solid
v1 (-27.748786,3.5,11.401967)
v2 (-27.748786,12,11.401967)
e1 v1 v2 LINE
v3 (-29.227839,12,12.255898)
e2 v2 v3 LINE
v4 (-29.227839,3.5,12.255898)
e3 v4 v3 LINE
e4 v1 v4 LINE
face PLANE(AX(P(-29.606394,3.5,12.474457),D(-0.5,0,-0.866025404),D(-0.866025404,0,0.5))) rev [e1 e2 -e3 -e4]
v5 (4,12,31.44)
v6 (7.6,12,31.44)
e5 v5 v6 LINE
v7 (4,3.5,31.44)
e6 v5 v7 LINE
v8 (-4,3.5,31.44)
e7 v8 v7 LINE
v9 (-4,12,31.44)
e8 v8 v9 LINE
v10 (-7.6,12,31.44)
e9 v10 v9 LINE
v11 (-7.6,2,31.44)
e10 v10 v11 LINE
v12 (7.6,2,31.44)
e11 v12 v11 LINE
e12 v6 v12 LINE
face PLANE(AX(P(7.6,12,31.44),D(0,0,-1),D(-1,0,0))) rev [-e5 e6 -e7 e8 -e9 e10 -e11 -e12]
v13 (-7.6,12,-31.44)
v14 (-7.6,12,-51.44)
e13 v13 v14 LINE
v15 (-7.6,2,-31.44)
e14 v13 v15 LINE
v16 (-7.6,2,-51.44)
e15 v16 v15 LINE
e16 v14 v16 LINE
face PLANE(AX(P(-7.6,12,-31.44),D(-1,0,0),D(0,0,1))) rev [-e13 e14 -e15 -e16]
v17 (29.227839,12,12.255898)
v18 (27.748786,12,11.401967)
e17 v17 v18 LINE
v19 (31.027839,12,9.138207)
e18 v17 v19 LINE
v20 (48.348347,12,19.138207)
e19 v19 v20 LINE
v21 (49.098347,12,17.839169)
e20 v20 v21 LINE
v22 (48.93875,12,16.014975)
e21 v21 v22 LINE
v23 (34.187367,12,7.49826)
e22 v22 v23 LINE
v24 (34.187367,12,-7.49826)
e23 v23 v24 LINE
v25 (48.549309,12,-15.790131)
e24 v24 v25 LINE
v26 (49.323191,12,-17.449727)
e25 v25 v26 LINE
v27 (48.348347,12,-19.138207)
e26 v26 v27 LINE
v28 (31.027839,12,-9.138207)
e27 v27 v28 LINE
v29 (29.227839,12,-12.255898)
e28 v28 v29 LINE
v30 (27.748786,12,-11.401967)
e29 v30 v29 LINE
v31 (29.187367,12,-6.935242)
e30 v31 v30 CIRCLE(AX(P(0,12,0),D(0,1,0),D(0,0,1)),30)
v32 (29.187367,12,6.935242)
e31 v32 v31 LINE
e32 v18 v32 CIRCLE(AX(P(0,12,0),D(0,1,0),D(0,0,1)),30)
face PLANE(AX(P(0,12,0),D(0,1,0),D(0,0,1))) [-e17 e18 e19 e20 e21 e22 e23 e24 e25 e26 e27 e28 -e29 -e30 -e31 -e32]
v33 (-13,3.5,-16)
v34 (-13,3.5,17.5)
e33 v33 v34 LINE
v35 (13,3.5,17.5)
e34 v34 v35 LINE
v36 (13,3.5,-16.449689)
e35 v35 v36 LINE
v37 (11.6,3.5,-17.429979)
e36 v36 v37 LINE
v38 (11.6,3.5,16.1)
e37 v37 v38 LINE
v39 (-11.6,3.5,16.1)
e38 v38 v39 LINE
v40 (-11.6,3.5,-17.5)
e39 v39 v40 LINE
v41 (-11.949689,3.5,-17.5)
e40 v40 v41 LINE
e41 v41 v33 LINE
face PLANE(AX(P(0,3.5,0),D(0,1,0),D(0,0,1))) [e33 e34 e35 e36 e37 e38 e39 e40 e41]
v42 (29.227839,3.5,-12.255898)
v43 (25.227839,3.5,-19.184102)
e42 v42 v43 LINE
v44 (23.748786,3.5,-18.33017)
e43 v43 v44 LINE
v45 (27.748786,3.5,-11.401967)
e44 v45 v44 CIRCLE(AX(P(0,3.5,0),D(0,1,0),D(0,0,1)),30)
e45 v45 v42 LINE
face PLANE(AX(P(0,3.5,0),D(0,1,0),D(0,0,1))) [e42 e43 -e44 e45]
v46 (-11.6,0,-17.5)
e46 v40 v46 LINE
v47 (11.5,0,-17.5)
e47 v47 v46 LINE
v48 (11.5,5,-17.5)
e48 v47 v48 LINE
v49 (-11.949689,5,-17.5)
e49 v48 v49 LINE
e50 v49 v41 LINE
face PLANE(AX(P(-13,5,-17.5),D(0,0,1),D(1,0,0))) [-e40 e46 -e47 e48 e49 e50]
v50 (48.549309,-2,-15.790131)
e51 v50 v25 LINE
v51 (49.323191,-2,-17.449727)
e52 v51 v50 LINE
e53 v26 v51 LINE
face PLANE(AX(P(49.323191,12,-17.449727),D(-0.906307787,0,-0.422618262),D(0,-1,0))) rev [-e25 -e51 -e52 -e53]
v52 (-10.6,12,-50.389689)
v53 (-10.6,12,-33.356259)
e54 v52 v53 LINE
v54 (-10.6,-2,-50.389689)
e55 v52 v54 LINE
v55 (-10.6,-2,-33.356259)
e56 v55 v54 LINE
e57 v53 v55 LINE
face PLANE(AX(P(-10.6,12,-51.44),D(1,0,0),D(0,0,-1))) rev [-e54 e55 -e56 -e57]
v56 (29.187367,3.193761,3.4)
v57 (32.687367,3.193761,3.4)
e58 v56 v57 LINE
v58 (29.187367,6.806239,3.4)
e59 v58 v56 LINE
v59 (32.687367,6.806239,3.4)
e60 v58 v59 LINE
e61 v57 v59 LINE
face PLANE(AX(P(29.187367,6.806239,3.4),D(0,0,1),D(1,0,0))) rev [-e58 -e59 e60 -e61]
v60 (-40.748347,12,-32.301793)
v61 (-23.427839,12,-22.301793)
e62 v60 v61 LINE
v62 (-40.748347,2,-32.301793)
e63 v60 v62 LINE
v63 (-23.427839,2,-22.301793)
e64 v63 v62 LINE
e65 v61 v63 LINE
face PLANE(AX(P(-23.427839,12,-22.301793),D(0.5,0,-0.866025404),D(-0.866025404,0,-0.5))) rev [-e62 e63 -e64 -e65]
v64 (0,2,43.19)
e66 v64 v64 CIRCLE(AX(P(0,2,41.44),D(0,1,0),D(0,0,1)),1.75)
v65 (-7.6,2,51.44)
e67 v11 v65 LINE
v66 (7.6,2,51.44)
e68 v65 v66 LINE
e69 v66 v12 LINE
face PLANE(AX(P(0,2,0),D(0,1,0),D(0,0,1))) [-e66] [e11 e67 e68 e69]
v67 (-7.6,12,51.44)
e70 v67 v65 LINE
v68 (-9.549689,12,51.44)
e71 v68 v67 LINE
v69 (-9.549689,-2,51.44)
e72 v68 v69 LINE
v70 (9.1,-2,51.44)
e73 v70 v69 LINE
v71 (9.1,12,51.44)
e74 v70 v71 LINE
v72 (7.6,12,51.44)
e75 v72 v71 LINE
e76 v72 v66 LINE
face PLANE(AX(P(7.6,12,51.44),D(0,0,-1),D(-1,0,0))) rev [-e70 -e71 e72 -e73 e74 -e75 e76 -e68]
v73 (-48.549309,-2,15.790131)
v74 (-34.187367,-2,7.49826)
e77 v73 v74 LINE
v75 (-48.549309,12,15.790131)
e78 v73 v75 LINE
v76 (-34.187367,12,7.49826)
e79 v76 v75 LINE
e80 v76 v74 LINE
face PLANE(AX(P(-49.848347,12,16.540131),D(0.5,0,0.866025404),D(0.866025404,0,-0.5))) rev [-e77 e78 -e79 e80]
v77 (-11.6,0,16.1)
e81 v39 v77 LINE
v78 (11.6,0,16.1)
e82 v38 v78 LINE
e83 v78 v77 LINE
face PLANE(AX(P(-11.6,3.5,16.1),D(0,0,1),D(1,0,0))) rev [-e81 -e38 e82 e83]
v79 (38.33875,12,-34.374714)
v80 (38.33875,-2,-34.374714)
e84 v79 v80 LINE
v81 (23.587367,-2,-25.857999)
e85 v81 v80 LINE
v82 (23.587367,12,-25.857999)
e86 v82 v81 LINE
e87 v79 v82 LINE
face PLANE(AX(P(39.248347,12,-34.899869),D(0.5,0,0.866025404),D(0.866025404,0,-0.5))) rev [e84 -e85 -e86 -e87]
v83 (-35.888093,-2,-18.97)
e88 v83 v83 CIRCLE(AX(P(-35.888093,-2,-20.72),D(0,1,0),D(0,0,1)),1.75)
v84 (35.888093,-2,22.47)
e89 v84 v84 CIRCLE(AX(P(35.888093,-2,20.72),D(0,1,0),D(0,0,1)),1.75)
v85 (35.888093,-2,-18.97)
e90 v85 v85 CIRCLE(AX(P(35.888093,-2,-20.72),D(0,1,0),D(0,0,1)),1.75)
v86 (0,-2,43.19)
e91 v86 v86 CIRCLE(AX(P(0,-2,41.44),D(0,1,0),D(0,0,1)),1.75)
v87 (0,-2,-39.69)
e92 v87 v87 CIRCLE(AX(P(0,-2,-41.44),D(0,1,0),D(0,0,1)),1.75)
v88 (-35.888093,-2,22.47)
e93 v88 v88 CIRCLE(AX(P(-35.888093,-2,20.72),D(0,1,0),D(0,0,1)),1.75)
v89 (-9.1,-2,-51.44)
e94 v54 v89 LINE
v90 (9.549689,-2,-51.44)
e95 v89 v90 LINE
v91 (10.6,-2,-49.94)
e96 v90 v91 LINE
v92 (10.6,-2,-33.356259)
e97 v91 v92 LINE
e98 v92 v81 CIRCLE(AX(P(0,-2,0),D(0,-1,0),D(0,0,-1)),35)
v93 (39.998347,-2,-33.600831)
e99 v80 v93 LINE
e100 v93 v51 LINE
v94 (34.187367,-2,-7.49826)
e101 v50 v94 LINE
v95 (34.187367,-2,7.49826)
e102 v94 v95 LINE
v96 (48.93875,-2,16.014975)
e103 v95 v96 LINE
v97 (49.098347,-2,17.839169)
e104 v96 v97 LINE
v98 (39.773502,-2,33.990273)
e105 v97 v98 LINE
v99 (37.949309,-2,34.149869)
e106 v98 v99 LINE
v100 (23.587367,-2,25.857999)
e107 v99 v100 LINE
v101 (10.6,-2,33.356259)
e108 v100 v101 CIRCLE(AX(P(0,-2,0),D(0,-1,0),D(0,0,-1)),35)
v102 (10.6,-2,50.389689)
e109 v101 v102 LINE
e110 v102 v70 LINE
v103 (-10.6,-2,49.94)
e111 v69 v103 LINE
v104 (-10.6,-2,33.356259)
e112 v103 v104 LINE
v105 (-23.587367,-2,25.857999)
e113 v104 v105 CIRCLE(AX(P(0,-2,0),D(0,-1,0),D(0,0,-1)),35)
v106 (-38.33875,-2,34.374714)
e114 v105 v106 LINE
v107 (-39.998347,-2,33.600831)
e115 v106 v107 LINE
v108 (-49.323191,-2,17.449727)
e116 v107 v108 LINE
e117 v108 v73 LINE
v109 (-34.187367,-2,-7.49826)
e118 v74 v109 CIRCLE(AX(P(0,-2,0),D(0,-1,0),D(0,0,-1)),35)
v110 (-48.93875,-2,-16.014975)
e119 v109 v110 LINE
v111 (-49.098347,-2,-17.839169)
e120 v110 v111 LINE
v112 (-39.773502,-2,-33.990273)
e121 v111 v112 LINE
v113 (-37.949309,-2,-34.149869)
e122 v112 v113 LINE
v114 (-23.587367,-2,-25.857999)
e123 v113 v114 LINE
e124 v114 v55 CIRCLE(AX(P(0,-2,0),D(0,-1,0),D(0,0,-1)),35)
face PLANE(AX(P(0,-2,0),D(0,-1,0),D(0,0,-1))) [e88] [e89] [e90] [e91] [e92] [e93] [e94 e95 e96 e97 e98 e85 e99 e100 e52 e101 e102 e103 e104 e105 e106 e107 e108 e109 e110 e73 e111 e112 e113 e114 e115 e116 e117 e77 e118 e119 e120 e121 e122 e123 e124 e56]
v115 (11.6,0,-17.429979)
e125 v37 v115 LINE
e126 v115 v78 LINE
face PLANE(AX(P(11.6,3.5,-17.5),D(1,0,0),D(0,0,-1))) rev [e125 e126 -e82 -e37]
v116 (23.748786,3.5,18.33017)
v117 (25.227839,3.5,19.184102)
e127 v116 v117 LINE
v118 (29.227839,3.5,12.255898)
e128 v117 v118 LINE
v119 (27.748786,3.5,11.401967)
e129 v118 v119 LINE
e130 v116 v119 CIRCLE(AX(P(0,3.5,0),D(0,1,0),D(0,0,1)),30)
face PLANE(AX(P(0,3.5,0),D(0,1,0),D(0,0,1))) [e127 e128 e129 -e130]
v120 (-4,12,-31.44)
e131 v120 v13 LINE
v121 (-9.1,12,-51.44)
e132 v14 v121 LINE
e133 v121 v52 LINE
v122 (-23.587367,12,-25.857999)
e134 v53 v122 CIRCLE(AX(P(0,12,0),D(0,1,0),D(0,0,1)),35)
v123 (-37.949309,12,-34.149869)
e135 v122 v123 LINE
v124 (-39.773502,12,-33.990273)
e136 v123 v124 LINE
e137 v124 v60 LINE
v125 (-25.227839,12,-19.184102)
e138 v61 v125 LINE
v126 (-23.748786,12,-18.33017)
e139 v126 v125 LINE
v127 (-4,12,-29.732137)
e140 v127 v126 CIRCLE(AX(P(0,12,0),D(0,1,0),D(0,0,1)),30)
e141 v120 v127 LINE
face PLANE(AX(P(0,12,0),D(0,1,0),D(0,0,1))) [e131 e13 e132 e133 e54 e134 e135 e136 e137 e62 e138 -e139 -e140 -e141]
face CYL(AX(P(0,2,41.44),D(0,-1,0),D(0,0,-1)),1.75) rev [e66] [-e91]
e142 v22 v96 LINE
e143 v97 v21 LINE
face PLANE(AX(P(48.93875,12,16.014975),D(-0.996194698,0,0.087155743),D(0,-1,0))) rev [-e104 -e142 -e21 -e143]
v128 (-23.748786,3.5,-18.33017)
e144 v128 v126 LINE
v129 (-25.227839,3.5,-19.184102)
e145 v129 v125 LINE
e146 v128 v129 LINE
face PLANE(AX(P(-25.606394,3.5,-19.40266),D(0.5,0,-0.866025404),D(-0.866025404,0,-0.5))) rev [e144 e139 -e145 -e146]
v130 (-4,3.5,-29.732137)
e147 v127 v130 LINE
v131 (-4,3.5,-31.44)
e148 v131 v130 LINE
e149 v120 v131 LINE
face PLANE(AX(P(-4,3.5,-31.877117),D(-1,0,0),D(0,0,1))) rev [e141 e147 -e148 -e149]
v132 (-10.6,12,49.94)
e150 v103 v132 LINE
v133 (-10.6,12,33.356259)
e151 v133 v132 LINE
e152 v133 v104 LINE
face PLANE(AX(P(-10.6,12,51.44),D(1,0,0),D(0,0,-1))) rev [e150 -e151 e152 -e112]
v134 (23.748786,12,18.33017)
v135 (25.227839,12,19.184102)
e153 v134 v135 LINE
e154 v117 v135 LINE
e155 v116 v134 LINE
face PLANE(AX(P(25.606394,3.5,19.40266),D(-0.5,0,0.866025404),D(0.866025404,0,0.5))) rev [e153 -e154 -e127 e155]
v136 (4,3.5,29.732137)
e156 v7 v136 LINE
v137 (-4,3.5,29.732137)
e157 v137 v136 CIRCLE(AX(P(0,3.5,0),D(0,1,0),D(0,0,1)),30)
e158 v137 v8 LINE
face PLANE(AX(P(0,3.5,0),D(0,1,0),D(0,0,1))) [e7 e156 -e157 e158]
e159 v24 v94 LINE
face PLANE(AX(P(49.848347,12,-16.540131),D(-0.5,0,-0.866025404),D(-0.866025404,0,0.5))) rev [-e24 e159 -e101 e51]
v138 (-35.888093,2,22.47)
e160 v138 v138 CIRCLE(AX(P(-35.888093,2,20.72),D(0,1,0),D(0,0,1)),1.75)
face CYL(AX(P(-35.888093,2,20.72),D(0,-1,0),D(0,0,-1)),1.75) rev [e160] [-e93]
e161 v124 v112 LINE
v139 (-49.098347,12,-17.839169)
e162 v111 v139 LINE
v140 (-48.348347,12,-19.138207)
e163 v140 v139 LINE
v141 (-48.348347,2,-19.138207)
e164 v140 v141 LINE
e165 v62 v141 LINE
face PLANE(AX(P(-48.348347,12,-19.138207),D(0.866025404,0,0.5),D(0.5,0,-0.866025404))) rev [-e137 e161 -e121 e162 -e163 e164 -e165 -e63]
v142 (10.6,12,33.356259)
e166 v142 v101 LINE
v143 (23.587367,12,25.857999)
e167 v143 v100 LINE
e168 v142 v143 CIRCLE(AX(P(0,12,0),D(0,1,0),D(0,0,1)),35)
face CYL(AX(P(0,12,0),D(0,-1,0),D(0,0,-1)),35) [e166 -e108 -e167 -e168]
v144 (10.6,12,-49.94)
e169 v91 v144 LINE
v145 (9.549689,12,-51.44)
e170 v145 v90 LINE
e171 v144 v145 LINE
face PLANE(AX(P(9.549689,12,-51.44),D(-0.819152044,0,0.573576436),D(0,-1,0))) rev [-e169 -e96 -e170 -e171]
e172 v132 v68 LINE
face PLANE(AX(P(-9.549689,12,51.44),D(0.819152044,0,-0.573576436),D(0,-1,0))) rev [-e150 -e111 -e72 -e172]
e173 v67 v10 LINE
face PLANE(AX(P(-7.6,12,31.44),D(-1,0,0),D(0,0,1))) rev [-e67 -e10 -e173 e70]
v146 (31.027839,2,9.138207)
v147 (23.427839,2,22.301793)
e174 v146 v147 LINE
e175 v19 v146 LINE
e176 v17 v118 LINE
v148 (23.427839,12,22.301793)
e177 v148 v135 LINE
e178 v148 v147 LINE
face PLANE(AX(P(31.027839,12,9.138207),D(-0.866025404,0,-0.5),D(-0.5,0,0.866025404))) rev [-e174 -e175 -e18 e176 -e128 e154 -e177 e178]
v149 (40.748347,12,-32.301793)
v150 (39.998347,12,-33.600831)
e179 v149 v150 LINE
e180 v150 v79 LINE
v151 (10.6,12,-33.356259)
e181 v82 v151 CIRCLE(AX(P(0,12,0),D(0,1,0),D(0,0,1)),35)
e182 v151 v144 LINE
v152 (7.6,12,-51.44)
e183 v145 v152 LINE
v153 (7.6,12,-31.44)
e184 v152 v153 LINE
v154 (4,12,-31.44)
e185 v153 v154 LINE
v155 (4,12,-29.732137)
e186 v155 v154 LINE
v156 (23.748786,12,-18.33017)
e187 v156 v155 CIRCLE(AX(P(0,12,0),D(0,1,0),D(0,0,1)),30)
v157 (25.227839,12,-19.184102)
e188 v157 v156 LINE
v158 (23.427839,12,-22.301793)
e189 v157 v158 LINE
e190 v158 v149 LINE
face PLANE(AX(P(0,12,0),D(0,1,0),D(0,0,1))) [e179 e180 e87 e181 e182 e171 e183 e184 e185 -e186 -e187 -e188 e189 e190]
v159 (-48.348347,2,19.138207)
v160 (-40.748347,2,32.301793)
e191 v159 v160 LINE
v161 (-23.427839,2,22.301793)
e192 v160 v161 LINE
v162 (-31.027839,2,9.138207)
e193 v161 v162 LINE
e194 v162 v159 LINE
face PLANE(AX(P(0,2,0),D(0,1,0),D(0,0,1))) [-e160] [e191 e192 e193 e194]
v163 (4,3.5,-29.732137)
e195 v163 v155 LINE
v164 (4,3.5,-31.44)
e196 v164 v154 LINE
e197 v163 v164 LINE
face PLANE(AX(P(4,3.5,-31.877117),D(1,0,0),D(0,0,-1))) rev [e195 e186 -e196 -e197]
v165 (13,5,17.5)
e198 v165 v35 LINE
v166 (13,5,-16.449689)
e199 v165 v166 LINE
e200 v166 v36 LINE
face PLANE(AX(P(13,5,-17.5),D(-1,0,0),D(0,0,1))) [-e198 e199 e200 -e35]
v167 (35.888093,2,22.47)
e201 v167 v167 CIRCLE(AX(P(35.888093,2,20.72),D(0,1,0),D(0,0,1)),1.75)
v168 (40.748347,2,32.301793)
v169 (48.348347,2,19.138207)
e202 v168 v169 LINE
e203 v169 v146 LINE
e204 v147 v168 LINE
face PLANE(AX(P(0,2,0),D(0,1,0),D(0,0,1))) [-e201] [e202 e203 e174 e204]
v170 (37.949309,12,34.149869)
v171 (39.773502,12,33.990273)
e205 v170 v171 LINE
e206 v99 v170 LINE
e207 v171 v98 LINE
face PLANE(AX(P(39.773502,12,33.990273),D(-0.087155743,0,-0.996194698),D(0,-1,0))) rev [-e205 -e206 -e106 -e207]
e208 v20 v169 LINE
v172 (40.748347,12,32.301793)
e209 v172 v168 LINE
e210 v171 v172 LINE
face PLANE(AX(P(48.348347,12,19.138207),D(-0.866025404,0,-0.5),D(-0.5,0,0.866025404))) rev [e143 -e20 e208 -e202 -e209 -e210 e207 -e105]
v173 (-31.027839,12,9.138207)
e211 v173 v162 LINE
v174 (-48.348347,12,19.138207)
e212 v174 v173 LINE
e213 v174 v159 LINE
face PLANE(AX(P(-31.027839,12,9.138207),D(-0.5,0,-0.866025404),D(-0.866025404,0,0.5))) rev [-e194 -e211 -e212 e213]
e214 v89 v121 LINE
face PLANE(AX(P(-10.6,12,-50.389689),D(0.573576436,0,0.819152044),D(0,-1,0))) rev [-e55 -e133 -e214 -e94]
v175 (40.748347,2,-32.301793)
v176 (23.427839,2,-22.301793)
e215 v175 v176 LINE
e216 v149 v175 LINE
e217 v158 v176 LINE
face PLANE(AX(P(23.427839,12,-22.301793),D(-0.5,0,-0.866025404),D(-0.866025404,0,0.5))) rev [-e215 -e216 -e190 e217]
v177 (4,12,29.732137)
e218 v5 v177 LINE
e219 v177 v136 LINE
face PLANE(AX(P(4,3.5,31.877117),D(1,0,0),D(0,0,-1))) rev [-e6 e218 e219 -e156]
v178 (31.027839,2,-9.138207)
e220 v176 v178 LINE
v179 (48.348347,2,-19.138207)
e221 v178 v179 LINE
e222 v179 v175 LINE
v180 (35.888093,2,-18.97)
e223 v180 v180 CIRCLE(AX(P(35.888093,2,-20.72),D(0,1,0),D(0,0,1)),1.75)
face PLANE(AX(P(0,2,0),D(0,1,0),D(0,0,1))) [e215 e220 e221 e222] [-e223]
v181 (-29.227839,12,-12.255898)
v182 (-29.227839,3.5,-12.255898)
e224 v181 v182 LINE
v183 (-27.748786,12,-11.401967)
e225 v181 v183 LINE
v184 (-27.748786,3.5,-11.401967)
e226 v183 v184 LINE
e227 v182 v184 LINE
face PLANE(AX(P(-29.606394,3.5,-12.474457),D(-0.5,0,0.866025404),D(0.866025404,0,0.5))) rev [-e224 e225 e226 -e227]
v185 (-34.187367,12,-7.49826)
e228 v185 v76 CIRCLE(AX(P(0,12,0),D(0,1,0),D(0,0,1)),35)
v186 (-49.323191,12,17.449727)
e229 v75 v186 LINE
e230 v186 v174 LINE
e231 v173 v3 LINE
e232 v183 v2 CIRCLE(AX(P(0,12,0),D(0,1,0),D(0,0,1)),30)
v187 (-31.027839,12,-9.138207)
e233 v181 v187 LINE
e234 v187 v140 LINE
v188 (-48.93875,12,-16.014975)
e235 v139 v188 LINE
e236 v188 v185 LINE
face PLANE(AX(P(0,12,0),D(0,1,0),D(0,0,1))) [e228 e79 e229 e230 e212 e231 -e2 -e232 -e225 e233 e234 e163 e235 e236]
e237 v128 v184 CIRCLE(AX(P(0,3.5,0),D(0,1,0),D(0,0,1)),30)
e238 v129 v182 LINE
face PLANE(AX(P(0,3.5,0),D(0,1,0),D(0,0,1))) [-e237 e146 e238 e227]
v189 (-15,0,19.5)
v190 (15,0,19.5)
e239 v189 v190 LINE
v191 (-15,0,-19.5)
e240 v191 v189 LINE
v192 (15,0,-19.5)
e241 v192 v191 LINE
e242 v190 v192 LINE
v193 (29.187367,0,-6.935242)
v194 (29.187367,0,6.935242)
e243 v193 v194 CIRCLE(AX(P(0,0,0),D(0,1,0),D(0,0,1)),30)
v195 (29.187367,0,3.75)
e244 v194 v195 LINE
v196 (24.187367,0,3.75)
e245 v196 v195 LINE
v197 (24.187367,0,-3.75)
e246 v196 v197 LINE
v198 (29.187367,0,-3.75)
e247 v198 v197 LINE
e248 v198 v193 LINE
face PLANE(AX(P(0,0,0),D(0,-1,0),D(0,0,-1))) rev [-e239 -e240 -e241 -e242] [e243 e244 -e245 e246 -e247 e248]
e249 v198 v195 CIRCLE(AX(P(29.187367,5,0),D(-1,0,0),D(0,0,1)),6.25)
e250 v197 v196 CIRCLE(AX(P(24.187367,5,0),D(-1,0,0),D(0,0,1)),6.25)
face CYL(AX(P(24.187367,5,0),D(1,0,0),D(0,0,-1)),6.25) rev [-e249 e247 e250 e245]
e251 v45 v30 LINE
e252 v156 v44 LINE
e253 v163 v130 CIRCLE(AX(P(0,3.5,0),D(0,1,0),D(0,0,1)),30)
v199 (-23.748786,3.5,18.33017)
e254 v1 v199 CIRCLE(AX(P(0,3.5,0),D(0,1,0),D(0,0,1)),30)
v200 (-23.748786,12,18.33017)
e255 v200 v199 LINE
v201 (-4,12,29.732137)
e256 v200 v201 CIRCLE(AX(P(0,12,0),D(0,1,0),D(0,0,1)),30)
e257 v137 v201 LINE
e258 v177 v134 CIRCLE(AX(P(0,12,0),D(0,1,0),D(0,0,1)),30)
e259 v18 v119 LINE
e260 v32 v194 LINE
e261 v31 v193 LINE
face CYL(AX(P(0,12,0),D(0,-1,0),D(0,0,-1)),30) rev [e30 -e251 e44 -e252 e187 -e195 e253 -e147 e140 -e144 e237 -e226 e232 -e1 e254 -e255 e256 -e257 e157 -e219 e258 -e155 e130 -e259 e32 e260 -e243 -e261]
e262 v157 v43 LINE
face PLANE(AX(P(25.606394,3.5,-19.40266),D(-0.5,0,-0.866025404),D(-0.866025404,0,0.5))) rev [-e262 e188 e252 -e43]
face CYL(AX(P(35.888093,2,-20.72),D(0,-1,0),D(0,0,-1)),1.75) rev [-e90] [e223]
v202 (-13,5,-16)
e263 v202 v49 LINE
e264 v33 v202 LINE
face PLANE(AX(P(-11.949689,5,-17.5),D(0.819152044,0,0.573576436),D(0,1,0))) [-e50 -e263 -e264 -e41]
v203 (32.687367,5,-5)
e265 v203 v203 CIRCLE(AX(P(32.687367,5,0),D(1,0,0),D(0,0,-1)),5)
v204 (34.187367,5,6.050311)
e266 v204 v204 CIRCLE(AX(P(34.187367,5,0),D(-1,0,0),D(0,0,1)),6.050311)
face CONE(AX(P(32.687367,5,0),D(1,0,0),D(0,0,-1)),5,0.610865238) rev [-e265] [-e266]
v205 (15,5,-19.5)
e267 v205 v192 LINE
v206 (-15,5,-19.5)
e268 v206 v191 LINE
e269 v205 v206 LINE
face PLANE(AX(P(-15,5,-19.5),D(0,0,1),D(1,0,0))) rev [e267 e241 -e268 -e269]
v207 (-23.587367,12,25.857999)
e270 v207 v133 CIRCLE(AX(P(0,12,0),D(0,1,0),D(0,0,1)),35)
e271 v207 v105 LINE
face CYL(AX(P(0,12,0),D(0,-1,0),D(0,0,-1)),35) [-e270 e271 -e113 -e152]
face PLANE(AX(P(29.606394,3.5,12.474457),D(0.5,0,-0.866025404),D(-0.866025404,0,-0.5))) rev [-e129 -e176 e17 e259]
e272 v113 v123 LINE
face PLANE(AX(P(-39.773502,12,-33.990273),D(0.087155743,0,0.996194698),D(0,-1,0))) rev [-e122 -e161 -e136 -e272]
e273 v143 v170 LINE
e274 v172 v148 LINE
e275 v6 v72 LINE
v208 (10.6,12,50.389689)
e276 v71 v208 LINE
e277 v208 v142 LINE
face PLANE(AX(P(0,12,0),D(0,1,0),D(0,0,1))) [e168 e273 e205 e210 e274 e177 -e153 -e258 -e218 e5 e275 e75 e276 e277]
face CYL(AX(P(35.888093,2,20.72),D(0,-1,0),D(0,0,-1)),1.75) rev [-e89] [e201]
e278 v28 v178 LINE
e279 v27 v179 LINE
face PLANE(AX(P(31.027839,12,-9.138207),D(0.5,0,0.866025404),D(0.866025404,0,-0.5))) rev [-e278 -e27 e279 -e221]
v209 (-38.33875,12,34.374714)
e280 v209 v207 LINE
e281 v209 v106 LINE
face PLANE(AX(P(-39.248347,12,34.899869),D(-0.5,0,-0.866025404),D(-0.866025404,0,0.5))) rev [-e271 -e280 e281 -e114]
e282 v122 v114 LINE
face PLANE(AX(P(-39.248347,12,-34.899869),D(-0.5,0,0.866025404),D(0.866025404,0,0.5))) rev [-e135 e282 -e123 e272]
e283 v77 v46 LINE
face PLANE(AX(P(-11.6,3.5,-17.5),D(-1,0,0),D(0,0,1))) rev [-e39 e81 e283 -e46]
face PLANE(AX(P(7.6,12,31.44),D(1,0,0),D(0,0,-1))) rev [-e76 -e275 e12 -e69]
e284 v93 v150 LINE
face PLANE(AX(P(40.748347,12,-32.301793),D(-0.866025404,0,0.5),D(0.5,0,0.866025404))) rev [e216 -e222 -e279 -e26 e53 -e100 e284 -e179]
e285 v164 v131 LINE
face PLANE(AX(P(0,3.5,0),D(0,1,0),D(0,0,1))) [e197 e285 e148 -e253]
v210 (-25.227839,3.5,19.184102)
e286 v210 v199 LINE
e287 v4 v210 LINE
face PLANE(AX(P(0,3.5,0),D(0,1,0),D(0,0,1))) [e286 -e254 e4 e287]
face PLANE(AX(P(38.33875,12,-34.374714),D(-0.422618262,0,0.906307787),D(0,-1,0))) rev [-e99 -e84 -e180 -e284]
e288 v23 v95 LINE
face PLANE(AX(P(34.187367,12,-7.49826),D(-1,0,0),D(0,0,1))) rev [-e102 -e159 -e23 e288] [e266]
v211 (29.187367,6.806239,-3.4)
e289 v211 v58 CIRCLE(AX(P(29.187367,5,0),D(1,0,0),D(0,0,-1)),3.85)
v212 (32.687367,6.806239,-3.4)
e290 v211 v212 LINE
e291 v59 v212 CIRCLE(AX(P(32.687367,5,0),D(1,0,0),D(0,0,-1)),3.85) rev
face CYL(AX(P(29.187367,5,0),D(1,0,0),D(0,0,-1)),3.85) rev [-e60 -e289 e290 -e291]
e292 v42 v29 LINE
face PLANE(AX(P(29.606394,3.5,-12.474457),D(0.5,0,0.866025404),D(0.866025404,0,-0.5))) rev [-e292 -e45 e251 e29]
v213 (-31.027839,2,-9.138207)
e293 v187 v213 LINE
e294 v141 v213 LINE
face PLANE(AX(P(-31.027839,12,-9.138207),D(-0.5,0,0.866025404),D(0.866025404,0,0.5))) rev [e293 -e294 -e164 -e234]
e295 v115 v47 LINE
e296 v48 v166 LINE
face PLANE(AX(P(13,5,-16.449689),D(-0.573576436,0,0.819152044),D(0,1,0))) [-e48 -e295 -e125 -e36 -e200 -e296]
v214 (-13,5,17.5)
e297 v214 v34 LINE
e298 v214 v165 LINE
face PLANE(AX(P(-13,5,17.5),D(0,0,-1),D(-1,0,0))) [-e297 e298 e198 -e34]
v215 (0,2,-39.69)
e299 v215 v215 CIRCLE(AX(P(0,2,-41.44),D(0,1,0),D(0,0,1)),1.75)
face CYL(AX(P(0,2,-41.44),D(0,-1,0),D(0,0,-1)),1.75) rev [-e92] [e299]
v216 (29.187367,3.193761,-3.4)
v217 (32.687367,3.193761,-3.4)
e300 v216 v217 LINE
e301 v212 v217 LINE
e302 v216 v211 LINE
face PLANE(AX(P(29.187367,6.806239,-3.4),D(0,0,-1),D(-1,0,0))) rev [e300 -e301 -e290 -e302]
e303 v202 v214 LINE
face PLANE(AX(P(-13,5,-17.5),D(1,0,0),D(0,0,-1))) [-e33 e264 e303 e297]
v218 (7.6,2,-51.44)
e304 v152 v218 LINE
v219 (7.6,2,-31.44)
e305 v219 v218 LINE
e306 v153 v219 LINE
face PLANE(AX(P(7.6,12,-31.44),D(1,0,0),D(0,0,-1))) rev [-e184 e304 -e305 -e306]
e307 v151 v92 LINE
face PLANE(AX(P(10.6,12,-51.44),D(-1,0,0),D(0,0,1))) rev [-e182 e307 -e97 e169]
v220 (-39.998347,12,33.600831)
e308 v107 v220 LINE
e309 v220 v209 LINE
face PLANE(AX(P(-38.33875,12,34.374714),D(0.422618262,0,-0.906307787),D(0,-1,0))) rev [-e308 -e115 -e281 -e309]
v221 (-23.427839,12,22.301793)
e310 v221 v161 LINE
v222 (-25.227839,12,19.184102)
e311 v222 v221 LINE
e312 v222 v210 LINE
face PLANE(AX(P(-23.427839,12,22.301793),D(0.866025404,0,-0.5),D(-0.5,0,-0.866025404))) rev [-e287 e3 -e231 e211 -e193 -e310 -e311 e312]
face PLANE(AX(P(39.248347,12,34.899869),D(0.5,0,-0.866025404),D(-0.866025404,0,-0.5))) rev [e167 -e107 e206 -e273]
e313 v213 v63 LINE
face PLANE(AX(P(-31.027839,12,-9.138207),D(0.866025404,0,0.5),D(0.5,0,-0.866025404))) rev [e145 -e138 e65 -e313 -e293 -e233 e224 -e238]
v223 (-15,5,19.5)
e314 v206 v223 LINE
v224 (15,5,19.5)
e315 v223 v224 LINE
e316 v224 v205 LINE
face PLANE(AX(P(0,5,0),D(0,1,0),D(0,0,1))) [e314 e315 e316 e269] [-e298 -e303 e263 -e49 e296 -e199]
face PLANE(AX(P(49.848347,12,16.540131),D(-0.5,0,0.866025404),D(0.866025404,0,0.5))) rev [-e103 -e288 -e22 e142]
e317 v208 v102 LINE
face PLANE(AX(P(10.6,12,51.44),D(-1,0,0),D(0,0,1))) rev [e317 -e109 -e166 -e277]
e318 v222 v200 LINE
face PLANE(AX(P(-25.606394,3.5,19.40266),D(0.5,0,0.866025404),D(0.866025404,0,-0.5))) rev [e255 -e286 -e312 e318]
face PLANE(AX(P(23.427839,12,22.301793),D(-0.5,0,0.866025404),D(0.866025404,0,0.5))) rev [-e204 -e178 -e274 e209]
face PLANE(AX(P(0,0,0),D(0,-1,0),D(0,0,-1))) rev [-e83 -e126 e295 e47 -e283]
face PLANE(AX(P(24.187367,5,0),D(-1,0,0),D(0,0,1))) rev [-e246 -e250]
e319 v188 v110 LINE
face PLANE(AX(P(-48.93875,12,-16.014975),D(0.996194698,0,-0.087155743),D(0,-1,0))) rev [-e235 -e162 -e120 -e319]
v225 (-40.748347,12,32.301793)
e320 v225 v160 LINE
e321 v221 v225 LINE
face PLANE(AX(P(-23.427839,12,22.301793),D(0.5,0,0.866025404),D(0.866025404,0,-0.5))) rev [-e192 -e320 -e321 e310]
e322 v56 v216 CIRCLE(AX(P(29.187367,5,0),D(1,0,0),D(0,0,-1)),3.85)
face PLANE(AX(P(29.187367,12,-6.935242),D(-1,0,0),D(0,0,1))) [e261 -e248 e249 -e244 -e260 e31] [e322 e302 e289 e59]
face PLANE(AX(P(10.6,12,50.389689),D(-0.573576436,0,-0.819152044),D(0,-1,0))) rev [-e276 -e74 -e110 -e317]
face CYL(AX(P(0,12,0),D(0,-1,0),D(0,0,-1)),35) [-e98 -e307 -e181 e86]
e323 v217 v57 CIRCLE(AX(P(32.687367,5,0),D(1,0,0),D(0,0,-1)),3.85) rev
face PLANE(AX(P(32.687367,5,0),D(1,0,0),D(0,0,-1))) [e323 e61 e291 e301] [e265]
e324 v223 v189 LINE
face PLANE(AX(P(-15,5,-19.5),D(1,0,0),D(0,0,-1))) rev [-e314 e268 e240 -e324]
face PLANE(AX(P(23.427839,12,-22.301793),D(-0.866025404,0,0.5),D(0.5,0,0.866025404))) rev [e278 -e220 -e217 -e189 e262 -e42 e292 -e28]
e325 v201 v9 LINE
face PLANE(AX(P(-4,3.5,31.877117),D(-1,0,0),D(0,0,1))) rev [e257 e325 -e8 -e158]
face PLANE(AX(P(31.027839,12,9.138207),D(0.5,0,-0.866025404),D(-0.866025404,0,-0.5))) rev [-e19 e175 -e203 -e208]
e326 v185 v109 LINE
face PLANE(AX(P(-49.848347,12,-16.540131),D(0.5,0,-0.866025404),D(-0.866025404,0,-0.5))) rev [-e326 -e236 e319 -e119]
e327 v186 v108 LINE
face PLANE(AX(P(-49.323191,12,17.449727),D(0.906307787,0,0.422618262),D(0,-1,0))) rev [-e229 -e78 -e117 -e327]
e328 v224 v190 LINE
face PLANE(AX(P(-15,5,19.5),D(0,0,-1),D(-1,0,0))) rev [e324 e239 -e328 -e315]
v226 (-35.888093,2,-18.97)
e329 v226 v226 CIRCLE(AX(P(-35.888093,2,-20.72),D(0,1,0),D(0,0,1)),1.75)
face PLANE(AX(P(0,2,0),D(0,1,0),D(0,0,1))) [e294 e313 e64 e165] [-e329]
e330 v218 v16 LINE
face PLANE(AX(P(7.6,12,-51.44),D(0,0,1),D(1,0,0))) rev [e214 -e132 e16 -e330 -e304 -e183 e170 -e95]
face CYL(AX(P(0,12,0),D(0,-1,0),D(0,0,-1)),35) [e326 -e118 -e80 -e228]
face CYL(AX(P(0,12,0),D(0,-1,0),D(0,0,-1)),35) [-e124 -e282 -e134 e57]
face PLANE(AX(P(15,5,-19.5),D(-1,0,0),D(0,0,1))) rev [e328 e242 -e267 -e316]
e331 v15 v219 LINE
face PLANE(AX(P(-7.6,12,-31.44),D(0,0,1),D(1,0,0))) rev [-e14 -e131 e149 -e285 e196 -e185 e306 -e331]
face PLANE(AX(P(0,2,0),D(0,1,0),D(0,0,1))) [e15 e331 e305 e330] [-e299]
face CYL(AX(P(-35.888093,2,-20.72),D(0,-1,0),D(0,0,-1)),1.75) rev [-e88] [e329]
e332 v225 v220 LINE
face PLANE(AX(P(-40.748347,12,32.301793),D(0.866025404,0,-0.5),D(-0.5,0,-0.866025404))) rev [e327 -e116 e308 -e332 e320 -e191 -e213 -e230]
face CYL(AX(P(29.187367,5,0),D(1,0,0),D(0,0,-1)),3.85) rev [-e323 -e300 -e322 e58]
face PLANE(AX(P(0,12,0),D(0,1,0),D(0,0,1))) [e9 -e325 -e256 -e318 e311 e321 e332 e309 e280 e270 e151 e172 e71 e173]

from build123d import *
from OCP.BRepFilletAPI import BRepFilletAPI_MakeChamfer

# Parameters (mm, degrees)
EXTRUDE_1_DEPTH     = 12
EXTRUDE_START       = 2
EXTRUDE_2_DEPTH     = 2
SKETCH_3_W          = 15.199999999999989
SKETCH_3_H          = 19.99999999999999
SKETCH_3_R          = 1.7500000000000004
SKETCH_3_R_2        = 1.7500000000005023
SKETCH_3_R_3        = 1.7500000000022933
SKETCH_3_R_4        = 1.7500000000036793
SKETCH_3_R_5        = 1.7500000000033842
SKETCH_3_R_6        = 1.7500000000018003
EXTRUDE_3_DEPTH     = 2
SKETCH_4_W          = 8
SKETCH_4_H          = 3.321565507275732
CUT_EXTRUDE_1_DEPTH = 8.5
CUT_EXTRUDE_2_DEPTH = 5
SKETCH_7_R          = 5
CUT_EXTRUDE_3_DEPTH = 1.5
CHAMFER_1_SIZE2     = 1.5
CHAMFER_1_SIZE      = 1.050311307
SKETCH_8_R          = 6.250000000000001
CUT_EXTRUDE_4_DEPTH = 5
SKETCH_6_W          = 30.000000000000018
SKETCH_6_H          = 39.00000000000001
EXTRUDE_4_DEPTH     = 5
EXTRUDE_5_DEPTH     = 3.5
CHAMFER_2_SIZE      = 1.5
CHAMFER_2_SIZE2     = 1.0503113073145682
SKETCH_10_R         = 1.7500000000000036
SKETCH_10_R_2       = 1.7500000000006353
SKETCH_10_R_3       = 1.750000000002967
SKETCH_10_R_4       = 1.750000000004767
SKETCH_10_R_5       = 1.7500000000043445
SKETCH_10_R_6       = 1.7500000000022113
CUT_EXTRUDE_5_DEPTH = 73.62872211301196
CHAMFER_3_SIZE      = 1.5
CHAMFER_3_SIZE2     = 1.0503113073145682
CHAMFER_3_SIZE2_2   = 1.0503113073145676
CHAMFER_3_SIZE2_3   = 1.050311307314569
CHAMFER_3_SIZE2_4   = 1.0503113073145678
CHAMFER_3_SIZE2_5   = 1.0503113073145673
CHAMFER_3_SIZE2_6   = 1.050311307314568


with BuildPart() as part:
    # Эскиз1 → Бобышка-Вытянуть1 (new body)
    with BuildSketch(Plane(origin=(0, 0, 0), x_dir=(1, 0, 0), z_dir=(0, 1, 0))):
        with BuildLine():
            Line((-7.599999999999993, 31.44), (-7.599999999999996, 51.44))
            Line((-7.599999999999996, 51.44), (-10.599999999999994, 51.44))
            Line((-10.599999999999994, 51.44), (-10.599999999999993, 33.35625878302303))
            ThreePointArc((-10.599999999999993, 33.35625878302303), (-17.499999999999947, 30.310889132455397), (-23.587367481305645, 25.857998671626635))
            Line((-23.587367481305645, 25.857998671626635), (-39.24834677067146, 34.8998692801151))
            Line((-39.24834677067146, 34.8998692801151), (-40.74834677067145, 32.30179306876178))
            Line((-40.74834677067145, 32.30179306876178), (-23.427838694982682, 22.3017930687618))
            Line((-23.427838694982682, 22.3017930687618), (-31.02783869498267, 9.138206931238326))
            Line((-31.02783869498267, 9.138206931238326), (-48.34834677067144, 19.138206931238315))
            Line((-48.34834677067144, 19.138206931238315), (-49.84834677067145, 16.540130719884996))
            Line((-49.84834677067145, 16.540130719884996), (-34.18736748130565, 7.498260111396523))
            ThreePointArc((-34.18736748130565, 7.498260111396523), (-34.99999999999993, 1.4417e-13), (-34.18736748130567, -7.49826011139625))
            Line((-34.18736748130567, -7.49826011139625), (-49.848346770671455, -16.540130719884772))
            Line((-49.848346770671455, -16.540130719884772), (-48.34834677067145, -19.138206931238084))
            Line((-48.34834677067145, -19.138206931238084), (-31.027838694982687, -9.138206931238079))
            Line((-31.027838694982687, -9.138206931238079), (-23.42783869498268, -22.301793068761537))
            Line((-23.42783869498268, -22.301793068761537), (-40.74834677067144, -32.301793068761555))
            Line((-40.74834677067144, -32.301793068761555), (-39.248346770671446, -34.89986928011487))
            Line((-39.248346770671446, -34.89986928011487), (-23.587367481305666, -25.85799867162636))
            ThreePointArc((-23.587367481305666, -25.85799867162636), (-17.49999999999999, -30.310889132455134), (-10.60000000000007, -33.35625878302277))
            Line((-10.60000000000007, -33.35625878302277), (-10.60000000000005, -51.439999999999756))
            Line((-10.60000000000005, -51.439999999999756), (-7.6000000000000485, -51.439999999999756))
            Line((-7.6000000000000485, -51.439999999999756), (-7.600000000000051, -31.43999999999976))
            Line((-7.600000000000051, -31.43999999999976), (7.599999999999947, -31.43999999999976))
            Line((7.599999999999947, -31.43999999999976), (7.59999999999995, -51.439999999999756))
            Line((7.59999999999995, -51.439999999999756), (10.59999999999995, -51.439999999999756))
            Line((10.59999999999995, -51.439999999999756), (10.599999999999941, -33.35625878302278))
            ThreePointArc((10.599999999999941, -33.35625878302278), (17.499999999999876, -30.310889132455145), (23.58736748130558, -25.85799867162641))
            Line((23.58736748130558, -25.85799867162641), (39.24834677067138, -34.899869280114885))
            Line((39.24834677067138, -34.899869280114885), (40.74834677067138, -32.30179306876157))
            Line((40.74834677067138, -32.30179306876157), (23.427838694982615, -22.30179306876157))
            Line((23.427838694982615, -22.30179306876157), (31.027838694982613, -9.138206931238104))
            Line((31.027838694982613, -9.138206931238104), (48.348346770671384, -19.138206931238102))
            Line((48.348346770671384, -19.138206931238102), (49.848346770671384, -16.540130719884782))
            Line((49.848346770671384, -16.540130719884782), (34.18736748130559, -7.498260111396299))
            Line((34.18736748130559, -7.498260111396299), (34.187367481305614, 7.498260111396479))
            Line((34.187367481305614, 7.498260111396479), (49.848346770671405, 16.540130719884996))
            Line((49.848346770671405, 16.540130719884996), (48.34834677067141, 19.13820693123831))
            Line((48.34834677067141, 19.13820693123831), (31.027838694982638, 9.138206931238308))
            Line((31.027838694982638, 9.138206931238308), (23.427838694982633, 22.301793068761775))
            Line((23.427838694982633, 22.301793068761775), (40.748346770671404, 32.301793068761775))
            Line((40.748346770671404, 32.301793068761775), (39.248346770671404, 34.89986928011509))
            Line((39.248346770671404, 34.89986928011509), (23.587367481305627, 25.857998671626596))
            ThreePointArc((23.587367481305627, 25.857998671626596), (17.499999999999936, 30.31088913245534), (10.600000000000003, 33.35625878302302))
            Line((10.600000000000003, 33.35625878302302), (10.600000000000001, 51.44))
            Line((10.600000000000001, 51.44), (7.600000000000002, 51.44))
            Line((7.600000000000002, 51.44), (7.599999999999993, 31.44))
            Line((7.599999999999993, 31.44), (-7.599999999999993, 31.44))
        make_face()
        with BuildLine():
            Line((29.18736748130573, 6.935241849511566), (29.18736748130574, -6.935241849511548))
            ThreePointArc((29.18736748130574, -6.935241849511548), (-29.999999999999996, -9.65e-15), (29.18736748130573, 6.935241849511566))
        make_face(mode=Mode.SUBTRACT)
    extrude(amount=EXTRUDE_1_DEPTH)

    # Эскиз2 → Бобышка-Вытянуть2 (add)
    with BuildSketch(Plane.XZ.offset(EXTRUDE_START)):
        with BuildLine():
            Line((-10.60000000000005, 51.439999999999756), (10.59999999999995, 51.439999999999756))
            Line((10.59999999999995, 51.439999999999756), (10.599999999999941, 33.35625878302278))
            ThreePointArc((10.599999999999941, 33.35625878302278), (17.499999999999883, 30.31088913245516), (23.58736748130557, 25.8579986716264))
            Line((23.58736748130557, 25.8579986716264), (39.24834677067138, 34.899869280114885))
            Line((39.24834677067138, 34.899869280114885), (49.848346770671384, 16.540130719884782))
            Line((49.848346770671384, 16.540130719884782), (34.18736748130559, 7.498260111396299))
            Line((34.18736748130559, 7.498260111396299), (34.187367481305614, -7.498260111396479))
            Line((34.187367481305614, -7.498260111396479), (49.848346770671405, -16.540130719884996))
            Line((49.848346770671405, -16.540130719884996), (39.248346770671404, -34.89986928011509))
            Line((39.248346770671404, -34.89986928011509), (23.587367481305627, -25.857998671626596))
            ThreePointArc((23.587367481305627, -25.857998671626596), (17.499999999999947, -30.310889132455358), (10.600000000000001, -33.356258783022994))
            Line((10.600000000000001, -33.356258783022994), (10.600000000000001, -51.44))
            Line((10.600000000000001, -51.44), (-10.599999999999994, -51.44))
            Line((-10.599999999999994, -51.44), (-10.599999999999993, -33.35625878302303))
            ThreePointArc((-10.599999999999993, -33.35625878302303), (-17.49999999999994, -30.310889132455387), (-23.587367481305638, -25.857998671626646))
            Line((-23.587367481305638, -25.857998671626646), (-39.24834677067146, -34.8998692801151))
            Line((-39.24834677067146, -34.8998692801151), (-48.34834677067144, -19.138206931238315))
            Line((-48.34834677067144, -19.138206931238315), (-49.84834677067145, -16.540130719884996))
            Line((-49.84834677067145, -16.540130719884996), (-34.18736748130565, -7.498260111396523))
            ThreePointArc((-34.18736748130565, -7.498260111396523), (-34.99999999999991, -1.356e-13), (-34.187367481305685, 7.498260111396258))
            Line((-34.187367481305685, 7.498260111396258), (-49.848346770671455, 16.540130719884772))
            Line((-49.848346770671455, 16.540130719884772), (-39.248346770671446, 34.89986928011487))
            Line((-39.248346770671446, 34.89986928011487), (-23.587367481305666, 25.85799867162636))
            ThreePointArc((-23.587367481305666, 25.85799867162636), (-17.50000000000001, 30.310889132455106), (-10.6000000000001, 33.35625878302277))
            Line((-10.6000000000001, 33.35625878302277), (-10.60000000000005, 51.439999999999756))
        make_face()
    extrude(amount=-EXTRUDE_2_DEPTH)

    # Эскиз3 → Бобышка-Вытянуть3 (add)
    # profile 1 of 6: a face of its own
    with BuildSketch(Plane(origin=(0, 0, 0), x_dir=(1, 0, 0), z_dir=(0, 1, 0))):
        with Locations((-2.22e-15, 41.44)):
            Rectangle(SKETCH_3_W, SKETCH_3_H)
        with Locations(Location((-1.73e-15, 41.440000000000005, 0), (0, 0, 270))):
            Circle(SKETCH_3_R, mode=Mode.SUBTRACT)
    # profile 2 of 6: a face of its own
    with BuildSketch(Plane(origin=(0, 0, 0), x_dir=(1, 0, 0), z_dir=(0, 1, 0))):
        Polygon((40.74834677067241, 32.301793068763274), (48.34834677067242, 19.13820693123983), (31.02783869498364, 9.138206931239816), (23.427838694983645, 22.30179306876327), align=None)
        with Locations(Location((35.88809273282802, 20.72000000000155, 0), (0, 0, 270))):
            Circle(SKETCH_3_R_2, mode=Mode.SUBTRACT)
    # profile 3 of 6: a face of its own
    with BuildSketch(Plane(origin=(0, 0, 0), x_dir=(1, 0, 0), z_dir=(0, 1, 0))):
        Polygon((48.34834677067419, -19.13820693123672), (40.74834677067421, -32.30179306876019), (23.427838694985432, -22.301793068760183), (31.027838694985423, -9.138206931236725), align=None)
        with Locations(Location((35.88809273282982, -20.719999999998457, 0), (0, 0, 270))):
            Circle(SKETCH_3_R_3, mode=Mode.SUBTRACT)
    # profile 4 of 6: a face of its own
    with BuildSketch(Plane(origin=(0, 0, 0), x_dir=(1, 0, 0), z_dir=(0, 1, 0))):
        Polygon((7.600000000003557, -51.44), (-7.599999999996428, -51.44000000000001), (-7.5999999999964345, -31.44), (7.600000000003551, -31.44), align=None)
        with Locations(Location((3.56008e-12, -41.440000000000005, 0), (0, 0, 270))):
            Circle(SKETCH_3_R_4, mode=Mode.SUBTRACT)
    # profile 5 of 6: a face of its own
    with BuildSketch(Plane(origin=(0, 0, 0), x_dir=(1, 0, 0), z_dir=(0, 1, 0))):
        Polygon((-40.74834677066884, -32.301793068763295), (-48.34834677066885, -19.13820693123985), (-31.02783869498008, -9.138206931239829), (-23.42783869498008, -22.30179306876328), align=None)
        with Locations(Location((-35.88809273282446, -20.720000000001555, 0), (0, 0, 270))):
            Circle(SKETCH_3_R_5, mode=Mode.SUBTRACT)
    # profile 6 of 6: a face of its own
    with BuildSketch(Plane(origin=(0, 0, 0), x_dir=(1, 0, 0), z_dir=(0, 1, 0))):
        Polygon((-48.348346770670645, 19.138206931236688), (-40.74834677067068, 32.30179306876016), (-23.427838694981887, 22.30179306876017), (-31.027838694981867, 9.138206931236708), align=None)
        with Locations(Location((-35.888092732826266, 20.719999999998436, 0), (0, 0, 270))):
            Circle(SKETCH_3_R_6, mode=Mode.SUBTRACT)
    extrude(amount=EXTRUDE_3_DEPTH)

    # Эскиз4 → Вырез-Вытянуть1 (cut)
    with BuildSketch(Plane(origin=(0, 12, 0), x_dir=(1, 0, 0), z_dir=(0, 1, 0))):
        Polygon((25.60639352508, 19.40266034819837), (29.606393525080005, 12.474457117922865), (26.729833415445075, 10.813674364285001), (22.72983341544507, 17.74187759456051), align=None)
        with Locations((0, 30.216334712480567)):
            Rectangle(SKETCH_4_W, SKETCH_4_H)
        Polygon((29.606393525081625, -12.474457117920053), (25.60639352508163, -19.402660348195564), (22.7298334154467, -17.7418775945577), (26.729833415446695, -10.81367436428219), align=None)
        Polygon((4.000000000003237, -31.87711746611843), (-3.999999999996763, -31.87711746611843), (-3.999999999996764, -28.555551958842702), (4.0000000000032365, -28.555551958842702), align=None)
        Polygon((-25.60639352507676, -19.40266034819838), (-29.606393525076765, -12.474457117922876), (-26.72983341544184, -10.813674364285008), (-22.729833415441835, -17.741877594560513), align=None)
        Polygon((-29.6063935250784, 12.474457117920036), (-25.606393525078403, 19.40266034819555), (-22.729833415443473, 17.74187759455769), (-26.72983341544347, 10.813674364282175), align=None)
    extrude(amount=-CUT_EXTRUDE_1_DEPTH, mode=Mode.SUBTRACT)

    # Эскиз5 → Вырез-Вытянуть2 (cut)
    with BuildSketch(Plane(origin=(34.1873674813056, 0, 4.746e-14), x_dir=(1.39e-15, 0, -1), z_dir=(1, 0, 1.39e-15))):
        with BuildLine():
            Line((-3.4, 6.806239186818845), (-3.3999999999999986, 3.1937608131811546))
            ThreePointArc((-3.3999999999999986, 3.1937608131811546), (7.316e-14, 1.1499999999998796), (3.4000000000000004, 3.1937608131811555))
            Line((3.4000000000000004, 3.1937608131811555), (3.4, 6.806239186818847))
            ThreePointArc((3.4, 6.806239186818847), (7.145e-14, 8.84999999999988), (-3.4, 6.806239186818845))
        make_face()
    extrude(amount=-CUT_EXTRUDE_2_DEPTH, mode=Mode.SUBTRACT)

    # Эскиз7 → Вырез-Вытянуть3 (cut)
    with BuildSketch(Plane(origin=(34.1873674813056, 0, 4.746e-14), x_dir=(1.39e-15, 0, -1), z_dir=(1, 0, 1.39e-15))):
        with Locations((1.3704e-13, 5)):
            Circle(SKETCH_7_R)
    extrude(amount=-CUT_EXTRUDE_3_DEPTH, mode=Mode.SUBTRACT)

    # Фаска1
    chamfer_1_edges = [part.edges().sort_by_distance(p)[0] for p in [
        (34.18736748130559, 5.000000000000001, 4.99999999999991),
    ]]
    chamfer_1_side = [part.faces().sort_by_distance(p)[0] for p in [
        (34.18736748130559, 5.000000000000001, 5.021006226146202),
    ]]
    chamfer(chamfer_1_edges, length=CHAMFER_1_SIZE - 0.0001, length2=CHAMFER_1_SIZE2 - 0.0001, reference=chamfer_1_side[0])  # a hair under: the kernel refuses the full size

    # Эскиз8 → Вырез-Вытянуть4 (cut)
    with BuildSketch(Plane.ZY.offset(-29.187367481305735)):
        with Locations((-7.532e-14, 5)):
            Circle(SKETCH_8_R)
    extrude(amount=CUT_EXTRUDE_4_DEPTH, mode=Mode.SUBTRACT)

    # Эскиз6 → Бобышка-Вытянуть4 (add)
    with BuildSketch(Plane(origin=(0, 0, 0), x_dir=(1, 0, 0), z_dir=(0, 1, 0))):
        Rectangle(SKETCH_6_W, SKETCH_6_H)
        Polygon((-13.000000000000002, 17.5), (12.999999999999995, 17.5), (13.000000000000002, -17.5), (-13.000000000000002, -17.5), align=None, mode=Mode.SUBTRACT)
    extrude(amount=EXTRUDE_4_DEPTH)

    # Эскиз9 → Бобышка-Вытянуть5 (add)
    with BuildSketch(Plane(origin=(0, 0, 0), x_dir=(1, 0, 0), z_dir=(0, 1, 0))):
        Polygon((-13.000000000000002, 17.5), (-11.600000000000001, 17.5), (-11.599999999999998, -16.1), (11.599999999999998, -16.1), (11.599999999999994, 17.5), (12.999999999999995, 17.5), (12.999999999999995, -17.5), (11.6, -17.5), (-11.599999999999996, -17.5), (-13.000000000000002, -17.5), align=None)
    extrude(amount=EXTRUDE_5_DEPTH)

    # Фаска2: one chamfer whose edges measure the first distance from different faces: ONE call of the kernel's chamfer builder (chamfer() names one face for all edges)
    chamfer_2_edges_1 = [part.edges().sort_by_distance(p)[0] for p in [
        (12.999999999999995, 4.25, -17.5),
    ]]
    chamfer_2_side_1 = [part.faces().sort_by_distance(p)[0] for p in [
        (-4.05e-15, 2.5611480865224623, -17.5),
    ]]
    chamfer_2_edges_2 = [part.edges().sort_by_distance(p)[0] for p in [
        (-13.000000000000002, 4.25, -17.5),
    ]]
    chamfer_2_side_2 = [part.faces().sort_by_distance(p)[0] for p in [
        (-13.000000000000002, 4.25, 6.7e-16),
    ]]
    chamfer_2 = BRepFilletAPI_MakeChamfer(part.part.solid().wrapped)
    for e in chamfer_2_edges_1:
        chamfer_2.Add(CHAMFER_2_SIZE, CHAMFER_2_SIZE2, e.wrapped, chamfer_2_side_1[0].wrapped)  # the first distance lies on this face
    for e in chamfer_2_edges_2:
        chamfer_2.Add(CHAMFER_2_SIZE, CHAMFER_2_SIZE2, e.wrapped, chamfer_2_side_2[0].wrapped)  # the first distance lies on this face
    add(Compound.cast(chamfer_2.Shape()), mode=Mode.REPLACE)

    # Эскиз10 → Вырез-Вытянуть5 (cut, through all)
    with BuildSketch(Plane(origin=(0, 0, 0), x_dir=(1, 0, 0), z_dir=(0, 1, 0))):
        with Locations(Location((-1.73e-15, 41.440000000000005, 0), (0, 0, 270))):
            Circle(SKETCH_10_R)
        with Locations(Location((35.8880927328283, 20.72000000000204, 0), (0, 0, 270))):
            Circle(SKETCH_10_R_2)
        with Locations(Location((35.88809273283067, -20.719999999997967, 0), (0, 0, 270))):
            Circle(SKETCH_10_R_3)
        with Locations(Location((4.69422e-12, -41.440000000000005, 0), (0, 0, 270))):
            Circle(SKETCH_10_R_4)
        with Locations(Location((-35.88809273282361, -20.72000000000205, 0), (0, 0, 270))):
            Circle(SKETCH_10_R_5)
        with Locations(Location((-35.88809273282598, 20.719999999997942, 0), (0, 0, 270))):
            Circle(SKETCH_10_R_6)
    extrude(amount=-CUT_EXTRUDE_5_DEPTH, mode=Mode.SUBTRACT)

    # Фаска3: one chamfer whose edges measure the first distance from different faces: ONE call of the kernel's chamfer builder (chamfer() names one face for all edges)
    chamfer_3_edges_1 = [part.edges().sort_by_distance(p)[0] for p in [
        (10.600000000000001, 5, -51.44),
    ]]
    chamfer_3_side_1 = [part.faces().sort_by_distance(p)[0] for p in [
        (10.600000000000001, 4.999999999999998, -42.3981293915115),
    ]]
    chamfer_3_edges_2 = [part.edges().sort_by_distance(p)[0] for p in [
        (39.248346770671404, 5, -34.89986928011509),
    ]]
    chamfer_3_side_2 = [part.faces().sort_by_distance(p)[0] for p in [
        (40.6213192146058, 7, -32.5218112498287),
    ]]
    chamfer_3_edges_3 = [part.edges().sort_by_distance(p)[0] for p in [
        (49.848346770671405, 5, -16.540130719884996),
    ]]
    chamfer_3_side_3 = [part.faces().sort_by_distance(p)[0] for p in [
        (42.017857125988506, 5, -12.019195415640738),
    ]]
    chamfer_3_edges_4 = [part.edges().sort_by_distance(p)[0] for p in [
        (49.848346770671384, 5, 16.540130719884782),
    ]]
    chamfer_3_side_4 = [part.faces().sort_by_distance(p)[0] for p in [
        (39.99834677067138, 11.745944887868793, 33.60083117443823),
    ]]
    chamfer_3_edges_5 = [part.edges().sort_by_distance(p)[0] for p in [
        (39.24834677067138, 5, 34.899869280114885),
    ]]
    chamfer_3_side_5 = [part.faces().sort_by_distance(p)[0] for p in [
        (31.417857125988476, 4.999999999999999, 30.37893397587065),
    ]]
    chamfer_3_edges_6 = [part.edges().sort_by_distance(p)[0] for p in [
        (10.59999999999995, 5, 51.439999999999756),
    ]]
    chamfer_3_side_6 = [part.faces().sort_by_distance(p)[0] for p in [
        (-9.10000000000005, 11.745944887868793, 51.439999999999756),
    ]]
    chamfer_3_edges_7 = [part.edges().sort_by_distance(p)[0] for p in [
        (-10.60000000000005, 5, 51.439999999999756),
    ]]
    chamfer_3_side_7 = [part.faces().sort_by_distance(p)[0] for p in [
        (-10.60000000000006, 5.000000000000001, 42.39812939151126),
    ]]
    chamfer_3_edges_8 = [part.edges().sort_by_distance(p)[0] for p in [
        (-39.248346770671446, 5, 34.89986928011487),
    ]]
    chamfer_3_side_8 = [part.faces().sort_by_distance(p)[0] for p in [
        (-49.09834677067145, 11.745944887868793, 17.83916882556143),
    ]]
    chamfer_3_edges_9 = [part.edges().sort_by_distance(p)[0] for p in [
        (-49.848346770671455, 5, 16.540130719884772),
    ]]
    chamfer_3_side_9 = [part.faces().sort_by_distance(p)[0] for p in [
        (-42.01785712598857, 5.000000000000002, 12.019195415640514),
    ]]
    chamfer_3_edges_10 = [part.edges().sort_by_distance(p)[0] for p in [
        (-49.84834677067145, 5, -16.540130719884996),
    ]]
    chamfer_3_side_10 = [part.faces().sort_by_distance(p)[0] for p in [
        (-39.99834677067146, 11.745944887868793, -33.60083117443844),
    ]]
    chamfer_3_edges_11 = [part.edges().sort_by_distance(p)[0] for p in [
        (-39.24834677067146, 5, -34.8998692801151),
    ]]
    chamfer_3_side_11 = [part.faces().sort_by_distance(p)[0] for p in [
        (-31.41785712598855, 5, -30.37893397587087),
    ]]
    chamfer_3_edges_12 = [part.edges().sort_by_distance(p)[0] for p in [
        (-10.599999999999994, 5, -51.44),
    ]]
    chamfer_3_side_12 = [part.faces().sort_by_distance(p)[0] for p in [
        (9.100000000000001, 11.745944887868793, -51.44),
    ]]
    chamfer_3 = BRepFilletAPI_MakeChamfer(part.part.solid().wrapped)
    for e in chamfer_3_edges_1:
        chamfer_3.Add(CHAMFER_3_SIZE, CHAMFER_3_SIZE2, e.wrapped, chamfer_3_side_1[0].wrapped)  # the first distance lies on this face
    for e in chamfer_3_edges_2:
        chamfer_3.Add(CHAMFER_3_SIZE, CHAMFER_3_SIZE2_2, e.wrapped, chamfer_3_side_2[0].wrapped)  # the first distance lies on this face
    for e in chamfer_3_edges_3:
        chamfer_3.Add(CHAMFER_3_SIZE, CHAMFER_3_SIZE2_3, e.wrapped, chamfer_3_side_3[0].wrapped)  # the first distance lies on this face
    for e in chamfer_3_edges_4:
        chamfer_3.Add(CHAMFER_3_SIZE, CHAMFER_3_SIZE2_4, e.wrapped, chamfer_3_side_4[0].wrapped)  # the first distance lies on this face
    for e in chamfer_3_edges_5:
        chamfer_3.Add(CHAMFER_3_SIZE, CHAMFER_3_SIZE2_3, e.wrapped, chamfer_3_side_5[0].wrapped)  # the first distance lies on this face
    for e in chamfer_3_edges_6:
        chamfer_3.Add(CHAMFER_3_SIZE, CHAMFER_3_SIZE2_4, e.wrapped, chamfer_3_side_6[0].wrapped)  # the first distance lies on this face
    for e in chamfer_3_edges_7:
        chamfer_3.Add(CHAMFER_3_SIZE, CHAMFER_3_SIZE2_3, e.wrapped, chamfer_3_side_7[0].wrapped)  # the first distance lies on this face
    for e in chamfer_3_edges_8:
        chamfer_3.Add(CHAMFER_3_SIZE, CHAMFER_3_SIZE2_3, e.wrapped, chamfer_3_side_8[0].wrapped)  # the first distance lies on this face
    for e in chamfer_3_edges_9:
        chamfer_3.Add(CHAMFER_3_SIZE, CHAMFER_3_SIZE2_5, e.wrapped, chamfer_3_side_9[0].wrapped)  # the first distance lies on this face
    for e in chamfer_3_edges_10:
        chamfer_3.Add(CHAMFER_3_SIZE, CHAMFER_3_SIZE2_3, e.wrapped, chamfer_3_side_10[0].wrapped)  # the first distance lies on this face
    for e in chamfer_3_edges_11:
        chamfer_3.Add(CHAMFER_3_SIZE, CHAMFER_3_SIZE2, e.wrapped, chamfer_3_side_11[0].wrapped)  # the first distance lies on this face
    for e in chamfer_3_edges_12:
        chamfer_3.Add(CHAMFER_3_SIZE, CHAMFER_3_SIZE2_6, e.wrapped, chamfer_3_side_12[0].wrapped)  # the first distance lies on this face
    add(Compound.cast(chamfer_3.Shape()), mode=Mode.REPLACE)


solid = part.part
